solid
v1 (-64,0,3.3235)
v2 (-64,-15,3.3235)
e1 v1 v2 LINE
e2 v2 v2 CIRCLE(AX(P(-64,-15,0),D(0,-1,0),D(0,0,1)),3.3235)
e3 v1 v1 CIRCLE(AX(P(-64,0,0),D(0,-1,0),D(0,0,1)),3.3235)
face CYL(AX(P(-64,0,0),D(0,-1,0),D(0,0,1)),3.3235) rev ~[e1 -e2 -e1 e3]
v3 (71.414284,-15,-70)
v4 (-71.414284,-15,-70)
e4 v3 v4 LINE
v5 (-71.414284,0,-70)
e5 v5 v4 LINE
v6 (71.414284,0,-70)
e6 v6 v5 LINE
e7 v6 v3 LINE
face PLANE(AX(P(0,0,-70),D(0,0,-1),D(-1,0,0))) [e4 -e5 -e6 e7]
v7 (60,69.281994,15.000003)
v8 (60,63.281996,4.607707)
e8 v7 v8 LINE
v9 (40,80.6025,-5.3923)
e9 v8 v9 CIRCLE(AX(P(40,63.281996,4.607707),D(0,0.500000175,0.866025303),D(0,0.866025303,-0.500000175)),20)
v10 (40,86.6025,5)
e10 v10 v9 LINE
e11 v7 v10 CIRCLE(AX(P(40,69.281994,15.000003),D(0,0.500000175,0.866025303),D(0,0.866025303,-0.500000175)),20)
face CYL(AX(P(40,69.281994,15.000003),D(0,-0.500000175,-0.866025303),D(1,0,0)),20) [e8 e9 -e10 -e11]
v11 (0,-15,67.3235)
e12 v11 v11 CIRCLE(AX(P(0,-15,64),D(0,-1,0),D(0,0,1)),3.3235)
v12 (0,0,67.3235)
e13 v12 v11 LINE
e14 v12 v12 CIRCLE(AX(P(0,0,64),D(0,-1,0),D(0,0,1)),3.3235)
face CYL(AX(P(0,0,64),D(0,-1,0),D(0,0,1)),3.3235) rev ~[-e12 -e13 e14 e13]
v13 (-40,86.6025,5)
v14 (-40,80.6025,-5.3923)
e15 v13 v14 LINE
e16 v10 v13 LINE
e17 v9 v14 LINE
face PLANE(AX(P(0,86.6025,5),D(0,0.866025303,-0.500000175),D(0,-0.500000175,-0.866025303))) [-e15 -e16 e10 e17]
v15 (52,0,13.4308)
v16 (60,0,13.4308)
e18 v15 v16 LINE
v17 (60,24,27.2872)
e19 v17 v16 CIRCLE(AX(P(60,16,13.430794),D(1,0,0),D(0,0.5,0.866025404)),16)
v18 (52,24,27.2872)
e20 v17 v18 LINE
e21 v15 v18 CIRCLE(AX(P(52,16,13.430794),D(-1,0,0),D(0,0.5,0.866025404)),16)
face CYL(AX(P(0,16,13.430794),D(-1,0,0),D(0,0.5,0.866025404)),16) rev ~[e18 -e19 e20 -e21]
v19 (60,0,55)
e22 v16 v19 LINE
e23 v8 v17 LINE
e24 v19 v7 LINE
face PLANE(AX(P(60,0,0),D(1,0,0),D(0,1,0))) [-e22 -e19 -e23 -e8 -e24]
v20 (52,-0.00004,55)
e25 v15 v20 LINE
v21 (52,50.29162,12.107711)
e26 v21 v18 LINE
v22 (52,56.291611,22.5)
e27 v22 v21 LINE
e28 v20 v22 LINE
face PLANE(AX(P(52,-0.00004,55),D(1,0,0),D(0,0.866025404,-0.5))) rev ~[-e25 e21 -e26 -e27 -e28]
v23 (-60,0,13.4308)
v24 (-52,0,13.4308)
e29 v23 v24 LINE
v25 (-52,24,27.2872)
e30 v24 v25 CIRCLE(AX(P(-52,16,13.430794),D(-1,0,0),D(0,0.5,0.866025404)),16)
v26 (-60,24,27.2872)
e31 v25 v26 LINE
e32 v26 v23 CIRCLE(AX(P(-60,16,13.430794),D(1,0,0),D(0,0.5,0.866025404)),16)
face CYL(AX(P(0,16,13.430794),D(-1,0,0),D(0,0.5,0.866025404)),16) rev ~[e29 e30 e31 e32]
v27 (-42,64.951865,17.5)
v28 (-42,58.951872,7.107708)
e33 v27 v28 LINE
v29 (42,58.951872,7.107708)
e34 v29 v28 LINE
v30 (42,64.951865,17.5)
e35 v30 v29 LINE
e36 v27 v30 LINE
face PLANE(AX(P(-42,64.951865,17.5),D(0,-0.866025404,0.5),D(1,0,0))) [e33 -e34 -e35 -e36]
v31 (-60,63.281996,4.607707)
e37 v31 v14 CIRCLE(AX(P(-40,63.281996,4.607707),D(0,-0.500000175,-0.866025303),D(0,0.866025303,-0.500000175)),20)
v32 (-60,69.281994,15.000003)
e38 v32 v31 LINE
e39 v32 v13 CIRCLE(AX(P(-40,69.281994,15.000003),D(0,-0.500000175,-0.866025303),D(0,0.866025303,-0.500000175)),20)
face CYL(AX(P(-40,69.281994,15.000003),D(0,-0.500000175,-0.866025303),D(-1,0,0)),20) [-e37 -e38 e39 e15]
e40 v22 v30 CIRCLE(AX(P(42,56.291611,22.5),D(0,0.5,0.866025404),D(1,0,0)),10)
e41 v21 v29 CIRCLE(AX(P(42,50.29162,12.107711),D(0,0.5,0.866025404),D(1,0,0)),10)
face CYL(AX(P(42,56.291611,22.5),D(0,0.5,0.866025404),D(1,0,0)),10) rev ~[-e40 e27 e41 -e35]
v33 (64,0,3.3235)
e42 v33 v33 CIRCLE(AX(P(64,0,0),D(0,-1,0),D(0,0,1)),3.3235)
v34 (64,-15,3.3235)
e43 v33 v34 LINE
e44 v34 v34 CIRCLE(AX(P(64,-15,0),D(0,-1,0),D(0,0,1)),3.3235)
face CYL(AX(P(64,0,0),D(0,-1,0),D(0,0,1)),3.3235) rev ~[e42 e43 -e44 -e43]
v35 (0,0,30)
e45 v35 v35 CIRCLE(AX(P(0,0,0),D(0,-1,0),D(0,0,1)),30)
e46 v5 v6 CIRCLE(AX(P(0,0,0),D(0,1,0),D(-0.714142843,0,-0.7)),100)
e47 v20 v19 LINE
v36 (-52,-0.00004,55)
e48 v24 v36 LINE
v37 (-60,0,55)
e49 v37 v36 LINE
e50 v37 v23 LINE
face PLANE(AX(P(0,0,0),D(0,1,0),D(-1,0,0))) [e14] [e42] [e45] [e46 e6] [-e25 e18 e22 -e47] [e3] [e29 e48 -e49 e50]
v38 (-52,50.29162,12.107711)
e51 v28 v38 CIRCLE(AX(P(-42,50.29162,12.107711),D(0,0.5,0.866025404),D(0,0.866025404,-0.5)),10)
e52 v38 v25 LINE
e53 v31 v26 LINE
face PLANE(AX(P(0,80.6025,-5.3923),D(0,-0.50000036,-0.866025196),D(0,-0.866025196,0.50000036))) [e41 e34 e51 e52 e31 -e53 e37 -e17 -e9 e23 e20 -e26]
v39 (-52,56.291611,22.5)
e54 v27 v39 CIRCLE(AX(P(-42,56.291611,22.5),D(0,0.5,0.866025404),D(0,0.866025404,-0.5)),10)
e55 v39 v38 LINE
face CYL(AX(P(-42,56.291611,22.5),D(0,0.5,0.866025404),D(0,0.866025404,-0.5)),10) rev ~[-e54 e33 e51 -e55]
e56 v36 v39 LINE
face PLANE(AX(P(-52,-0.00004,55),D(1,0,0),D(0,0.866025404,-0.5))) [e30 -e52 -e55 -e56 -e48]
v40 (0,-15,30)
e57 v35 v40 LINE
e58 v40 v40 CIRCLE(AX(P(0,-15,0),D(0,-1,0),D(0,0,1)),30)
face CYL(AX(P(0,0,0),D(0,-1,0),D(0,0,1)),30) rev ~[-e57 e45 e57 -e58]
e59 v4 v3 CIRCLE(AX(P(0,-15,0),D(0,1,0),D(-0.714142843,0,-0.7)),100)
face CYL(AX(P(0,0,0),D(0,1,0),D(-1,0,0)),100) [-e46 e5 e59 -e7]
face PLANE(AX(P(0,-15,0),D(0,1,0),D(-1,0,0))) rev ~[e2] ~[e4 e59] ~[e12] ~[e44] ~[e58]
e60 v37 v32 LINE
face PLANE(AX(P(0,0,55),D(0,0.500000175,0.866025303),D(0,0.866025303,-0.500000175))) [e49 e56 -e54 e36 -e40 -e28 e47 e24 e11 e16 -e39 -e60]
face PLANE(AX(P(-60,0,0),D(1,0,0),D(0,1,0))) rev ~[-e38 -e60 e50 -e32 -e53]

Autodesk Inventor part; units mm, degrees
ref_plane "YZ Plane" through (0, 0, 0) normal (1, 0, 0) x (0, 1, 0)
ref_plane "XZ Plane" through (0, 0, 0) normal (0, 1, 0) x (-1, 0, 0)
ref_plane "XY Plane" through (0, 0, 0) normal (0, 0, 1) x (1, 0, 0)
sketch "草图1" plane through (0, 0, 0) normal (0, 1, 0) x (-1, 0, 0)
  circle A0 centre (0, 0) radius 100
  circle A1 centre (0, 0) radius 64 construction
  point P0 (64, 0)
  point P1 (0, 64)
  point P2 (-64, 0)
  dimension "d0" = 200
  dimension "d1" = 128
extrude "拉伸1" add sketch "草图1" against normal blind 15
hole "孔1" at (-64, 0, 0) at (0, 0, 64) at (64, 0, 0) direction (0, -1, 0) diameter 6.647 end through all thread size "M8x1.25" designation "M8" class "6H" standard "GB Metric profile"
hole "孔2" at (0, 0, 0) direction (0, -1, 0) diameter 60 end through all
sketch "草图2" plane through (0, 0, 0) normal (1, 0, 0) x (0, 1, 0)
  line L0 (0, 55) -> (86.6025, 5)
  line L1 (86.6025, 5) -> (80.6025, -5.3923)
  line L2 (80.6025, -5.3923) -> (24, 27.2872)
  line L3 (0, 27.5) -> (0, 0)
  line L4 (0, 0) -> (0, 13.4308)
  arc A0 (24, 27.2872) -> (0, 13.4308) centre (16, 13.4308) ccw
  line L5 (0, -100) -> (0, 100) projected
  line L6 (0, 55) -> (0, 13.4308)
  point P0 (0, 13.4308)
  dimension "d19" = 55
  dimension "d20" = 100
  dimension "d22" = 12
  dimension "d23" = 0
  dimension "d24" = 16
extrude "拉伸2" add sketch "草图2" along normal mid plane 120
sketch "草图3" plane through (-60, 86.6025, 5) normal (0, 0.5, 0.8660254) x (1, 0, 0)
  line L0 (120, -100) -> (0, -100) projected
  line L1 (48.0104, -100) -> (71.9896, -100) projected
  line L2 (120, -100) -> (0, -100) projected
  line L3 (120, -100) -> (112, -100)
  line L4 (112, -100) -> (112, -35)
  line L5 (0, -100) -> (0, -79.2154) projected
  line L6 (0, -100) -> (8, -100)
  line L7 (8, -100) -> (8, -35)
  line L8 (18, -25) -> (102, -25)
  line L9 (112, -100) -> (8, -100)
  arc A0 (18, -25) -> (8, -35) centre (18, -35) ccw
  arc A1 (112, -35) -> (102, -25) centre (102, -35) ccw
  point P0 (60, -72.5)
  point P1 (112, -25)
  point P2 (8, -25)
  dimension "d27" = 8
  dimension "d28" = 75
  dimension "d29" = 8
  dimension "d30" = 75
  dimension "d31" = 10
extrude "拉伸3" cut sketch "草图3" against normal up to surface surface through (0, 0, 0) normal (0, 1, 0)
fillet "圆角1" radius 20 2 edges at (60, 83.6025, -0.1962) (-60, 83.6025, -0.1962)
sketch "草图4" plane through (0, 0, 0) normal (0, 1, 0) x (1, 0, 0)
  circle A0 centre (0, 0) radius 100 projected
  line L0 (0, 0) -> (0, 70)
  line L1 (0, 70) -> (-92.5065, 70)
  line L2 (-92.5065, 70) -> (-88.0231, 170.2178)
  line L3 (-88.0231, 170.2178) -> (67.3235, 163.2683)
  line L4 (67.3235, 163.2683) -> (102.3961, 70)
  line L5 (0, 70) -> (102.3961, 70)
  point P0 (71.4143, 70)
  point P1 (-71.4143, 70)
  dimension "d35" = 70
extrude "拉伸4" cut sketch "草图4" against normal through all contours L5 L1 A0 picked at (-44.3165, 72.9417)
properties part number "2"
